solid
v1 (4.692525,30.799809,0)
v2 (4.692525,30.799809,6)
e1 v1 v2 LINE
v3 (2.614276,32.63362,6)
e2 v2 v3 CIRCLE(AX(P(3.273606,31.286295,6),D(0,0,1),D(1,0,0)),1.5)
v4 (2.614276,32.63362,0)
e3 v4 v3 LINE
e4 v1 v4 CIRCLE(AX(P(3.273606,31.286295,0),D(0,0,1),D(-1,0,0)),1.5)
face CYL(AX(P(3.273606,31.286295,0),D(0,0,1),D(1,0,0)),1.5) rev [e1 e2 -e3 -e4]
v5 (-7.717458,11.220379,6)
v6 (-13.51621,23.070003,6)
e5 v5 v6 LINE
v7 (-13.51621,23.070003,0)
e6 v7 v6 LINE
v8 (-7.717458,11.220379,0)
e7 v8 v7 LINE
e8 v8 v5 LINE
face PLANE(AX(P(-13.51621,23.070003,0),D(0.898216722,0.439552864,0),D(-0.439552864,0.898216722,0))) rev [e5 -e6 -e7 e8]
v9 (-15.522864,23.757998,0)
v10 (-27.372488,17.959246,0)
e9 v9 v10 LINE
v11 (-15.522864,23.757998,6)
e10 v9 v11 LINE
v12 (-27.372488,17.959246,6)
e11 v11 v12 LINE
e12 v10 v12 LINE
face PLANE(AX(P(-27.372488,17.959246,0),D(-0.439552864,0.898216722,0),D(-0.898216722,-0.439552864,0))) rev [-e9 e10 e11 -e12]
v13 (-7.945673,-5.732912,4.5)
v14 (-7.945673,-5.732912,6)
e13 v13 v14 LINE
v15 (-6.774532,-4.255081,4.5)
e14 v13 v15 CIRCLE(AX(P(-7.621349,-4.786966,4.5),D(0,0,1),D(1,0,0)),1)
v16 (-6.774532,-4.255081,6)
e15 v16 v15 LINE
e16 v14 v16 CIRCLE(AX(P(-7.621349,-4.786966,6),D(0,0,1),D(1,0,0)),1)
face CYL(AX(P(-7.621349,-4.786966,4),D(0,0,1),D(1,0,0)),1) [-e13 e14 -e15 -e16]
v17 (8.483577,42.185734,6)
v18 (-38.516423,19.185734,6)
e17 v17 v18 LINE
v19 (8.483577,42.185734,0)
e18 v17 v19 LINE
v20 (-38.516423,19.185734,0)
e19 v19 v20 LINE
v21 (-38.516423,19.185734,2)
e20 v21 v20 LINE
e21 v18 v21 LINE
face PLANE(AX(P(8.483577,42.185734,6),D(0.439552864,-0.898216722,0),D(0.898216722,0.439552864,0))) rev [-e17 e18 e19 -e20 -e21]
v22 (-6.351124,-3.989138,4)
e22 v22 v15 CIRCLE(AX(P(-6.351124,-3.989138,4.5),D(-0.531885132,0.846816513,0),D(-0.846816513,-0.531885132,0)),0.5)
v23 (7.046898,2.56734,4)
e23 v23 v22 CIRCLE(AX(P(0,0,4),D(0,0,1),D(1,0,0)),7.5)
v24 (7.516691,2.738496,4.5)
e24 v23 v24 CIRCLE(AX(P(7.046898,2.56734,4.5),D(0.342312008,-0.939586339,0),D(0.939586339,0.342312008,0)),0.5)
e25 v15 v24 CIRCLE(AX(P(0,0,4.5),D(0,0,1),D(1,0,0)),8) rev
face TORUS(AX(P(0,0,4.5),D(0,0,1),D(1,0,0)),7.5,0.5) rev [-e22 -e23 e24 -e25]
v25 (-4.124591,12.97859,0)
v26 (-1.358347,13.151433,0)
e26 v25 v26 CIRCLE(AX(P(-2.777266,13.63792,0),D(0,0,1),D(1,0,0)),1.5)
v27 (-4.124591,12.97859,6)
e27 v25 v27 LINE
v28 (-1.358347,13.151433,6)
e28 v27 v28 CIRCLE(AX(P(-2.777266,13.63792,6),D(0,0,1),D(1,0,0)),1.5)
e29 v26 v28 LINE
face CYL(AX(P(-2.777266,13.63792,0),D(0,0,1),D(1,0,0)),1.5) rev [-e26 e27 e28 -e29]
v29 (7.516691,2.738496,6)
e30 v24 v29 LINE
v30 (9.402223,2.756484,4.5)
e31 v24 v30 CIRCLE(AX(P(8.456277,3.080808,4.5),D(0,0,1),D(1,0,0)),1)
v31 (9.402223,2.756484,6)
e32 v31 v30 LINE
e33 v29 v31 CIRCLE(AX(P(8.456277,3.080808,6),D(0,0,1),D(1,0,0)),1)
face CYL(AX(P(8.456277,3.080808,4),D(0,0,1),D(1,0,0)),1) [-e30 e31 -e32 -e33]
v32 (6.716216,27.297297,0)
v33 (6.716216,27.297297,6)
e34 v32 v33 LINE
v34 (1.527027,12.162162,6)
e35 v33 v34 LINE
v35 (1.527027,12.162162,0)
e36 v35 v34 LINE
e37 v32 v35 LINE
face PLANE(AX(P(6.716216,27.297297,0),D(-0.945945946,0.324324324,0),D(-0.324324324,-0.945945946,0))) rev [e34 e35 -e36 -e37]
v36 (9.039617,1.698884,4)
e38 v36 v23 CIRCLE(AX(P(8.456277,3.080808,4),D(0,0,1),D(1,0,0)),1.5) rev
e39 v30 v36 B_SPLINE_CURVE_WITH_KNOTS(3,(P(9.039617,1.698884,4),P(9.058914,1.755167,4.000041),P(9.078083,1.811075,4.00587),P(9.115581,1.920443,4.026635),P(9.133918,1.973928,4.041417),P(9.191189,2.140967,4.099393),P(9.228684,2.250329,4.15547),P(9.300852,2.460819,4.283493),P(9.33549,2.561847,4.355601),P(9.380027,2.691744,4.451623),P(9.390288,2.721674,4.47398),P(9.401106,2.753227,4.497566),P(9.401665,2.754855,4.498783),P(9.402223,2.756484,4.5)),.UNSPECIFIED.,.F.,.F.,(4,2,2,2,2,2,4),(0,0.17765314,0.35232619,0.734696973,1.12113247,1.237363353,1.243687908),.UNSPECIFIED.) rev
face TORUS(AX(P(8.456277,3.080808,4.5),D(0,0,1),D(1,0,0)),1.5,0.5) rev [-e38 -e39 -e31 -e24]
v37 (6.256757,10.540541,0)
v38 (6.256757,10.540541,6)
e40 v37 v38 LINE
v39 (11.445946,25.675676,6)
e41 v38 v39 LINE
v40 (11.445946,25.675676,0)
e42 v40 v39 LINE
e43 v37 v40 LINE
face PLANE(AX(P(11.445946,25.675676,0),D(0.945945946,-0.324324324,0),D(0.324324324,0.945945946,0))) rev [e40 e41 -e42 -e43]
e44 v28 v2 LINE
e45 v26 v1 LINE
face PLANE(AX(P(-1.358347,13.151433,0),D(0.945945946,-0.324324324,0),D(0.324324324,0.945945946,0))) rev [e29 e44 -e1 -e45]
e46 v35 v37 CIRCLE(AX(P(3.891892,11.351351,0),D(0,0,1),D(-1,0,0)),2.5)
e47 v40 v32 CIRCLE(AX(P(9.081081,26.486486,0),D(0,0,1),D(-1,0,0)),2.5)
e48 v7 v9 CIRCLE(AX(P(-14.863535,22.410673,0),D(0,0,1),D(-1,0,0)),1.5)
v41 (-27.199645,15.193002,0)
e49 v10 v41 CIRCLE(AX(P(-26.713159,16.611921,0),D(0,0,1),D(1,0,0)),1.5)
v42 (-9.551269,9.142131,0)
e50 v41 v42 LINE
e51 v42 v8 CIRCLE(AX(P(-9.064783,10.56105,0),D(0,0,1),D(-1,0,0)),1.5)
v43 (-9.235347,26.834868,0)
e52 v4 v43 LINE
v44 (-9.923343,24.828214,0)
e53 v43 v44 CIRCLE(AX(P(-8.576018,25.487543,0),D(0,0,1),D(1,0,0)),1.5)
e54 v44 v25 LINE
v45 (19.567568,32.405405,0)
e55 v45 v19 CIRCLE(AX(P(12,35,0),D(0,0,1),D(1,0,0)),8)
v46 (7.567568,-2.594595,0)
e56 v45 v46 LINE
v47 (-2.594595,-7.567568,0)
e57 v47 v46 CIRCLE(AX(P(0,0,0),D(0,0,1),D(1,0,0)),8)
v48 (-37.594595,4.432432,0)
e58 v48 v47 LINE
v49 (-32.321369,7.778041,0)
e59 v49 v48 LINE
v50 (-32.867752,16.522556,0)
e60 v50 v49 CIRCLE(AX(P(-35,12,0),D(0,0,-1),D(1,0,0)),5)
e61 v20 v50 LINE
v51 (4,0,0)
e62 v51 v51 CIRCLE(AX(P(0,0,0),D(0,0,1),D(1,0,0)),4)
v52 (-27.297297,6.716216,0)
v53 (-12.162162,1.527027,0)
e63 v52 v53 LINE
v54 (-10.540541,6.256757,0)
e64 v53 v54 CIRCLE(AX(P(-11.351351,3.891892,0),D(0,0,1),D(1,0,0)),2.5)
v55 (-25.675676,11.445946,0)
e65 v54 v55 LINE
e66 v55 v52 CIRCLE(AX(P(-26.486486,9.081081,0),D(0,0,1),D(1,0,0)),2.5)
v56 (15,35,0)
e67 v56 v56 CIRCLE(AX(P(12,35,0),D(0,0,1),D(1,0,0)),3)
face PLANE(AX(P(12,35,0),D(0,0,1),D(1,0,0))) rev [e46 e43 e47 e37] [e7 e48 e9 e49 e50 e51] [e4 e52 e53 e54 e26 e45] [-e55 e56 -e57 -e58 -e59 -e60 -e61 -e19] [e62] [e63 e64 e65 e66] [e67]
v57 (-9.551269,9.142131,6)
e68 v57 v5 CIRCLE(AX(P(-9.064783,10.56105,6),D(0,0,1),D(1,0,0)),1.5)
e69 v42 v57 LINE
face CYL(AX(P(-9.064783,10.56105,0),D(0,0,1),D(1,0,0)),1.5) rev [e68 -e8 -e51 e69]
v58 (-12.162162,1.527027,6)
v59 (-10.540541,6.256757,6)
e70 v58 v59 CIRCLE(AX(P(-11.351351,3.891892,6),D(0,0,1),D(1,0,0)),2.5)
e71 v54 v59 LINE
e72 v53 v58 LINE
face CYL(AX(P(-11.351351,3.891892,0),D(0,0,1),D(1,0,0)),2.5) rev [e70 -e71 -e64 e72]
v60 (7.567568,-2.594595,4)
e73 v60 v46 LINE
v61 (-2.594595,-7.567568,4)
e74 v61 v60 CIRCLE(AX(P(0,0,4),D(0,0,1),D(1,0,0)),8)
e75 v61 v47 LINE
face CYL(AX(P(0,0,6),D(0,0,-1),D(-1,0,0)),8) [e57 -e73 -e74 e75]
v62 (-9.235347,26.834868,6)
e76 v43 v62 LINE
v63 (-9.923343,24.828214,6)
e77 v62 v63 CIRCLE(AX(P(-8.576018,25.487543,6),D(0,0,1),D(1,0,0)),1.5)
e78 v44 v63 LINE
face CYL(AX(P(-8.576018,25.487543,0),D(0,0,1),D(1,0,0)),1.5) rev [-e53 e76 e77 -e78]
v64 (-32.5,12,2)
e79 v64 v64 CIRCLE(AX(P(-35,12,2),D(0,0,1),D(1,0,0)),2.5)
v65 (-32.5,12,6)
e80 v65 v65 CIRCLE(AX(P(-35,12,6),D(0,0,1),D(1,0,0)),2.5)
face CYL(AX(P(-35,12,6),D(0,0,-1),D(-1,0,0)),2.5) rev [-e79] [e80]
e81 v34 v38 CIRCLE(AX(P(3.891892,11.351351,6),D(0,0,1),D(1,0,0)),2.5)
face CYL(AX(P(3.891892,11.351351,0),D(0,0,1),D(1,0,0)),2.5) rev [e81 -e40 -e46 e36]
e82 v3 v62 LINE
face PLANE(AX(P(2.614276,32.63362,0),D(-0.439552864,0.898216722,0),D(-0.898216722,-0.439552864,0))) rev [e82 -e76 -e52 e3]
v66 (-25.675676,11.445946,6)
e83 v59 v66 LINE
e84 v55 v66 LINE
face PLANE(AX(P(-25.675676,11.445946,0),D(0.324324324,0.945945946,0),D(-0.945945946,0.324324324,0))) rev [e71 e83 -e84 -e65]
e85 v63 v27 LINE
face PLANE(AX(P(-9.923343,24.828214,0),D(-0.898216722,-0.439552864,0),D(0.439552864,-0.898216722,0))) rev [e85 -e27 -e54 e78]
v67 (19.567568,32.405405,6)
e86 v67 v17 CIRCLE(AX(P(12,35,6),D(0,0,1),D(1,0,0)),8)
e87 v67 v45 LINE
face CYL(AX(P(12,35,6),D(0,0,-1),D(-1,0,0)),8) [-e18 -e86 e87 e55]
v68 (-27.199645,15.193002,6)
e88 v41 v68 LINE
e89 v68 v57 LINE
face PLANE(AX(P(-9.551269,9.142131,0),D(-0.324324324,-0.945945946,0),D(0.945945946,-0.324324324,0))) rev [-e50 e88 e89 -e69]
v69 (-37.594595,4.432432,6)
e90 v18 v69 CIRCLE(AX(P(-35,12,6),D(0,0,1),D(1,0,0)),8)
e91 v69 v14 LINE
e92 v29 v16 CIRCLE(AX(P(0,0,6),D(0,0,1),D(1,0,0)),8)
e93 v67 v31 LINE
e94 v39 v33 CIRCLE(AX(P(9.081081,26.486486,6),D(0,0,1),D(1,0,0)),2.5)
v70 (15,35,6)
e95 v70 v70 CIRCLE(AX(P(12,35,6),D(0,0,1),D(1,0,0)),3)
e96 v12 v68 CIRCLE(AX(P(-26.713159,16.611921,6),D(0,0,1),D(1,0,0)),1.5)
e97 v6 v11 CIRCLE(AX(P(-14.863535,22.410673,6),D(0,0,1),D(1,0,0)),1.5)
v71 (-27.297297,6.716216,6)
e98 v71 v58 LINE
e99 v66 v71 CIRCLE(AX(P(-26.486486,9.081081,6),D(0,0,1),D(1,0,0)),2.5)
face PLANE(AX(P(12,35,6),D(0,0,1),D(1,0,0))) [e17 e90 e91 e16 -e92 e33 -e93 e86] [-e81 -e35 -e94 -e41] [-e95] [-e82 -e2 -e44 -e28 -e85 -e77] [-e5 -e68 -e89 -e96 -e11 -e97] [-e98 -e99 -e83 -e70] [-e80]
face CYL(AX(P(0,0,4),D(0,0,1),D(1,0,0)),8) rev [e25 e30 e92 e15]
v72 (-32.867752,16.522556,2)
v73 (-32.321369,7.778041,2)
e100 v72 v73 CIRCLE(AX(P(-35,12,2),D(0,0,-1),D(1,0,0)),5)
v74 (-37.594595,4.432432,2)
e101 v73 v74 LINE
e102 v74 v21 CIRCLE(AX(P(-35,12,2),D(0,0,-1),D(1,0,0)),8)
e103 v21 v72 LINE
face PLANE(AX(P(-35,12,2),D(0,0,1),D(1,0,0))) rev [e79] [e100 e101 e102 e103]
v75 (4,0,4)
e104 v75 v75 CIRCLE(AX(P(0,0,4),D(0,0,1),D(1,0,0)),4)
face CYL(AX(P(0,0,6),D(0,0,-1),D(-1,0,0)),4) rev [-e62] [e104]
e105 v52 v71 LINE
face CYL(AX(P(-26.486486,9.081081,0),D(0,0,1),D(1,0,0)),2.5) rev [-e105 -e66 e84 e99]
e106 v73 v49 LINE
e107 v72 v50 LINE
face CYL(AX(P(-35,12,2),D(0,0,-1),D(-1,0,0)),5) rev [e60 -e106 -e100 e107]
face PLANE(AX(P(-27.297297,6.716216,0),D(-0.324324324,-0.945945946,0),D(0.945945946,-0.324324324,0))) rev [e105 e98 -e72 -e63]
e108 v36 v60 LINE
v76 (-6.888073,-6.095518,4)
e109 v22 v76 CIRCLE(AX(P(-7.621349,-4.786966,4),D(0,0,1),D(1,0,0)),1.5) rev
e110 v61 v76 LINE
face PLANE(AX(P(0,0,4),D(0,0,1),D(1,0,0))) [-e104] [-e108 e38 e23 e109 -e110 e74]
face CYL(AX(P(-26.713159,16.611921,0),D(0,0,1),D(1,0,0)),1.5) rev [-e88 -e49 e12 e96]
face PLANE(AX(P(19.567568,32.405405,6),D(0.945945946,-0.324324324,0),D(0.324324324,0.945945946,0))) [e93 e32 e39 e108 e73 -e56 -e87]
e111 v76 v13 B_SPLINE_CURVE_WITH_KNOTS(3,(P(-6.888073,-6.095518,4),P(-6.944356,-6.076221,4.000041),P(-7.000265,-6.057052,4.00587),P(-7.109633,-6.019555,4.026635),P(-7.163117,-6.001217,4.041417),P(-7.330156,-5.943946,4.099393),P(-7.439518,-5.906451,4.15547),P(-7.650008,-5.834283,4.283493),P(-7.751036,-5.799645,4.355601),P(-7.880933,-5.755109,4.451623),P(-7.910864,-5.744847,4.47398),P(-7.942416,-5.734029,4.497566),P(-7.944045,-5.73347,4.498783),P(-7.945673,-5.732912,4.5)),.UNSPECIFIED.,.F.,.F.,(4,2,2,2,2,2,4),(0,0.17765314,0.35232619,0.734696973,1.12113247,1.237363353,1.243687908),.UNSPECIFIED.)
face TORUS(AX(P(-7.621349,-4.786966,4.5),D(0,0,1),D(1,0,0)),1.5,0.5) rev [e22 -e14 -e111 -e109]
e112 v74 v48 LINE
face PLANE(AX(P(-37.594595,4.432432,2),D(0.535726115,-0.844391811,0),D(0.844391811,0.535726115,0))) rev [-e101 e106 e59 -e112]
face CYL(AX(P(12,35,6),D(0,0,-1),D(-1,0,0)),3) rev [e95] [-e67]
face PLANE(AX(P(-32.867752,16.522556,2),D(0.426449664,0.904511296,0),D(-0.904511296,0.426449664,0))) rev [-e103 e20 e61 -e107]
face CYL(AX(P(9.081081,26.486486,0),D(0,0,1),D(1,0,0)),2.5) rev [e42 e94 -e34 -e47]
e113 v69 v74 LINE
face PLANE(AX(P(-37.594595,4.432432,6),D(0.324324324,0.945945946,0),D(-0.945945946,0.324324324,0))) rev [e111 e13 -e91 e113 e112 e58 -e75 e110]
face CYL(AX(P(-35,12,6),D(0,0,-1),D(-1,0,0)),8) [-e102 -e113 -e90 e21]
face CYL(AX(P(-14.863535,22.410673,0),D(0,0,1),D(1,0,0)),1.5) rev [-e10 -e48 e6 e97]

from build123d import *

# Parameters (mm, degrees)
SKETCH1_R               = 2.5
SKETCH1_R_2             = 4
SKETCH1_R_3             = 3
BOSS_EXTRUDE1_DEPTH     = 6
CUT_EXTRUDE1_DEPTH      = 62.10646447
CUT_EXTRUDE1_DEPTH_BACK = 62.10646447
CUT_EXTRUDE2_START      = -2
SKETCH4_R               = 8
CUT_EXTRUDE2_DEPTH      = 2
FILLET1_START           = 4
FILLET1_DEPTH           = 2
FILLET2_R               = 0.5
CUT_EXTRUDE3_DEPTH      = 2


with BuildPart() as part:
    # Sketch1 → Boss-Extrude1 (new body)
    with BuildSketch(Plane.XY):
        with BuildLine():
            Line((19.567567568, 32.405405405), (7.567567568, -2.594594595))
            ThreePointArc((7.567567568, -2.594594595), (3.516422912, -7.185733776), (-2.594594595, -7.567567568))
            Line((-2.594594595, -7.567567568), (-37.594594595, 4.432432432))
            ThreePointArc((-37.594594595, 4.432432432), (-42.984429152, 11.50111011), (-38.516422912, 19.185733776))
            Line((-38.516422912, 19.185733776), (8.483577088, 42.185733776))
            ThreePointArc((8.483577088, 42.185733776), (17.293075573, 40.998612422), (19.567567568, 32.405405405))
        make_face()
        with Locations((-35, 12)):
            Circle(SKETCH1_R, mode=Mode.SUBTRACT)
        Circle(SKETCH1_R_2, mode=Mode.SUBTRACT)
        with Locations((12, 35)):
            Circle(SKETCH1_R_3, mode=Mode.SUBTRACT)
    extrude(amount=BOSS_EXTRUDE1_DEPTH)

    # Sketch2 → Cut-Extrude1 (cut, two sides: drawn at the far end of the back side and taken through both)
    with BuildSketch(Plane.XY.offset(6).offset(-CUT_EXTRUDE1_DEPTH_BACK)):
        with BuildLine():
            Line((-27.3724879, 17.959246424), (-15.522864255, 23.75799842))
            ThreePointArc((-15.522864255, 23.75799842), (-14.377048473, 23.829592256), (-13.516209876, 23.070002633))
            Line((-13.516209876, 23.070002633), (-7.71745788, 11.220378988))
            ThreePointArc((-7.71745788, 11.220378988), (-7.940043134, 9.568598022), (-9.551269449, 9.142130773))
            Line((-9.551269449, 9.142130773), (-27.199645091, 15.193002422))
            ThreePointArc((-27.199645091, 15.193002422), (-28.21023907, 16.518379486), (-27.3724879, 17.959246424))
        make_face()
        with BuildLine():
            Line((-25.675675676, 11.445945946), (-10.540540541, 6.256756757))
            ThreePointArc((-10.540540541, 6.256756757), (-8.986486486, 3.081081081), (-12.162162162, 1.527027027))
            Line((-12.162162162, 1.527027027), (-27.297297297, 6.716216216))
            ThreePointArc((-27.297297297, 6.716216216), (-28.851351351, 9.891891892), (-25.675675676, 11.445945946))
        make_face()
        with BuildLine():
            Line((-9.923342988, 24.828214089), (-4.124590991, 12.978590444))
            ThreePointArc((-4.124590991, 12.978590444), (-2.683724054, 12.140839274), (-1.358346989, 13.151433254))
            Line((-1.358346989, 13.151433254), (4.692524659, 30.799808895))
            ThreePointArc((4.692524659, 30.799808895), (4.26605741, 32.41103521), (2.614276444, 32.633620464))
            Line((2.614276444, 32.633620464), (-9.235347201, 26.834868468))
            ThreePointArc((-9.235347201, 26.834868468), (-9.994936824, 25.974029871), (-9.923342988, 24.828214089))
        make_face()
        with BuildLine():
            Line((6.716216216, 27.297297297), (1.527027027, 12.162162162))
            ThreePointArc((1.527027027, 12.162162162), (3.081081081, 8.986486486), (6.256756757, 10.540540541))
            Line((6.256756757, 10.540540541), (11.445945946, 25.675675676))
            ThreePointArc((11.445945946, 25.675675676), (9.891891892, 28.851351351), (6.716216216, 27.297297297))
        make_face()
    extrude(amount=CUT_EXTRUDE1_DEPTH + CUT_EXTRUDE1_DEPTH_BACK, mode=Mode.SUBTRACT)

    # Sketch4 → Cut-Extrude2 (cut)
    with BuildSketch(Plane.XY.offset(6).offset(CUT_EXTRUDE2_START)):
        Circle(SKETCH4_R)
    extrude(amount=CUT_EXTRUDE2_DEPTH, mode=Mode.SUBTRACT)

    # Fillet1: read off the stored shape, not the designer's step
    # Fillet1 outline → Fillet1 (cut)
    with BuildSketch(Plane.XY.offset(FILLET1_START)):
        with BuildLine():
            ThreePointArc((9.402223, 2.75648375), (8.465816464, 2.080853575), (7.516690715, 2.738496066))
            ThreePointArc((7.516690715, 2.738496066), (7.999635991, 0.076315279), (7.567567568, -2.594594595))
            Line((7.567567568, -2.594594595), (9.402223, 2.75648375))
        make_face()
        with BuildLine():
            ThreePointArc((-2.594594595, -7.567567568), (-4.968729766, -6.269906261), (-6.774532102, -4.255081057))
            ThreePointArc((-6.774532102, -4.255081057), (-6.837610332, -5.40805741), (-7.945672939, -5.732912135))
            Line((-7.945672939, -5.732912135), (-2.594594595, -7.567567568))
        make_face()
    extrude(amount=FILLET1_DEPTH, mode=Mode.SUBTRACT)

    # Fillet2
    fillet2_edges = [part.edges().sort_by_distance(p)[0] for p in [
        (-3.516422912, 7.185733776, 4),
        (8.465816464, 2.080853575, 4),
        (-6.837610332, -5.40805741, 4),
    ]]
    fillet(fillet2_edges, radius=FILLET2_R)

    # Sketch5 → Cut-Extrude3 (cut)
    with BuildSketch(Plane(origin=(0, 0, 0), x_dir=(-1, 0, 0), z_dir=(0, 0, -1))):
        with BuildLine():
            Line((37.594594595, 4.432432432), (32.321369427, 7.778040946))
            ThreePointArc((32.321369427, 7.778040946), (30.00973178, 12.311806181), (32.86775168, 16.522556479))
            Line((32.86775168, 16.522556479), (38.516422912, 19.185733776))
            ThreePointArc((38.516422912, 19.185733776), (42.984429152, 11.50111011), (37.594594595, 4.432432432))
        make_face()
    extrude(amount=-CUT_EXTRUDE3_DEPTH, mode=Mode.SUBTRACT)


solid = part.part
